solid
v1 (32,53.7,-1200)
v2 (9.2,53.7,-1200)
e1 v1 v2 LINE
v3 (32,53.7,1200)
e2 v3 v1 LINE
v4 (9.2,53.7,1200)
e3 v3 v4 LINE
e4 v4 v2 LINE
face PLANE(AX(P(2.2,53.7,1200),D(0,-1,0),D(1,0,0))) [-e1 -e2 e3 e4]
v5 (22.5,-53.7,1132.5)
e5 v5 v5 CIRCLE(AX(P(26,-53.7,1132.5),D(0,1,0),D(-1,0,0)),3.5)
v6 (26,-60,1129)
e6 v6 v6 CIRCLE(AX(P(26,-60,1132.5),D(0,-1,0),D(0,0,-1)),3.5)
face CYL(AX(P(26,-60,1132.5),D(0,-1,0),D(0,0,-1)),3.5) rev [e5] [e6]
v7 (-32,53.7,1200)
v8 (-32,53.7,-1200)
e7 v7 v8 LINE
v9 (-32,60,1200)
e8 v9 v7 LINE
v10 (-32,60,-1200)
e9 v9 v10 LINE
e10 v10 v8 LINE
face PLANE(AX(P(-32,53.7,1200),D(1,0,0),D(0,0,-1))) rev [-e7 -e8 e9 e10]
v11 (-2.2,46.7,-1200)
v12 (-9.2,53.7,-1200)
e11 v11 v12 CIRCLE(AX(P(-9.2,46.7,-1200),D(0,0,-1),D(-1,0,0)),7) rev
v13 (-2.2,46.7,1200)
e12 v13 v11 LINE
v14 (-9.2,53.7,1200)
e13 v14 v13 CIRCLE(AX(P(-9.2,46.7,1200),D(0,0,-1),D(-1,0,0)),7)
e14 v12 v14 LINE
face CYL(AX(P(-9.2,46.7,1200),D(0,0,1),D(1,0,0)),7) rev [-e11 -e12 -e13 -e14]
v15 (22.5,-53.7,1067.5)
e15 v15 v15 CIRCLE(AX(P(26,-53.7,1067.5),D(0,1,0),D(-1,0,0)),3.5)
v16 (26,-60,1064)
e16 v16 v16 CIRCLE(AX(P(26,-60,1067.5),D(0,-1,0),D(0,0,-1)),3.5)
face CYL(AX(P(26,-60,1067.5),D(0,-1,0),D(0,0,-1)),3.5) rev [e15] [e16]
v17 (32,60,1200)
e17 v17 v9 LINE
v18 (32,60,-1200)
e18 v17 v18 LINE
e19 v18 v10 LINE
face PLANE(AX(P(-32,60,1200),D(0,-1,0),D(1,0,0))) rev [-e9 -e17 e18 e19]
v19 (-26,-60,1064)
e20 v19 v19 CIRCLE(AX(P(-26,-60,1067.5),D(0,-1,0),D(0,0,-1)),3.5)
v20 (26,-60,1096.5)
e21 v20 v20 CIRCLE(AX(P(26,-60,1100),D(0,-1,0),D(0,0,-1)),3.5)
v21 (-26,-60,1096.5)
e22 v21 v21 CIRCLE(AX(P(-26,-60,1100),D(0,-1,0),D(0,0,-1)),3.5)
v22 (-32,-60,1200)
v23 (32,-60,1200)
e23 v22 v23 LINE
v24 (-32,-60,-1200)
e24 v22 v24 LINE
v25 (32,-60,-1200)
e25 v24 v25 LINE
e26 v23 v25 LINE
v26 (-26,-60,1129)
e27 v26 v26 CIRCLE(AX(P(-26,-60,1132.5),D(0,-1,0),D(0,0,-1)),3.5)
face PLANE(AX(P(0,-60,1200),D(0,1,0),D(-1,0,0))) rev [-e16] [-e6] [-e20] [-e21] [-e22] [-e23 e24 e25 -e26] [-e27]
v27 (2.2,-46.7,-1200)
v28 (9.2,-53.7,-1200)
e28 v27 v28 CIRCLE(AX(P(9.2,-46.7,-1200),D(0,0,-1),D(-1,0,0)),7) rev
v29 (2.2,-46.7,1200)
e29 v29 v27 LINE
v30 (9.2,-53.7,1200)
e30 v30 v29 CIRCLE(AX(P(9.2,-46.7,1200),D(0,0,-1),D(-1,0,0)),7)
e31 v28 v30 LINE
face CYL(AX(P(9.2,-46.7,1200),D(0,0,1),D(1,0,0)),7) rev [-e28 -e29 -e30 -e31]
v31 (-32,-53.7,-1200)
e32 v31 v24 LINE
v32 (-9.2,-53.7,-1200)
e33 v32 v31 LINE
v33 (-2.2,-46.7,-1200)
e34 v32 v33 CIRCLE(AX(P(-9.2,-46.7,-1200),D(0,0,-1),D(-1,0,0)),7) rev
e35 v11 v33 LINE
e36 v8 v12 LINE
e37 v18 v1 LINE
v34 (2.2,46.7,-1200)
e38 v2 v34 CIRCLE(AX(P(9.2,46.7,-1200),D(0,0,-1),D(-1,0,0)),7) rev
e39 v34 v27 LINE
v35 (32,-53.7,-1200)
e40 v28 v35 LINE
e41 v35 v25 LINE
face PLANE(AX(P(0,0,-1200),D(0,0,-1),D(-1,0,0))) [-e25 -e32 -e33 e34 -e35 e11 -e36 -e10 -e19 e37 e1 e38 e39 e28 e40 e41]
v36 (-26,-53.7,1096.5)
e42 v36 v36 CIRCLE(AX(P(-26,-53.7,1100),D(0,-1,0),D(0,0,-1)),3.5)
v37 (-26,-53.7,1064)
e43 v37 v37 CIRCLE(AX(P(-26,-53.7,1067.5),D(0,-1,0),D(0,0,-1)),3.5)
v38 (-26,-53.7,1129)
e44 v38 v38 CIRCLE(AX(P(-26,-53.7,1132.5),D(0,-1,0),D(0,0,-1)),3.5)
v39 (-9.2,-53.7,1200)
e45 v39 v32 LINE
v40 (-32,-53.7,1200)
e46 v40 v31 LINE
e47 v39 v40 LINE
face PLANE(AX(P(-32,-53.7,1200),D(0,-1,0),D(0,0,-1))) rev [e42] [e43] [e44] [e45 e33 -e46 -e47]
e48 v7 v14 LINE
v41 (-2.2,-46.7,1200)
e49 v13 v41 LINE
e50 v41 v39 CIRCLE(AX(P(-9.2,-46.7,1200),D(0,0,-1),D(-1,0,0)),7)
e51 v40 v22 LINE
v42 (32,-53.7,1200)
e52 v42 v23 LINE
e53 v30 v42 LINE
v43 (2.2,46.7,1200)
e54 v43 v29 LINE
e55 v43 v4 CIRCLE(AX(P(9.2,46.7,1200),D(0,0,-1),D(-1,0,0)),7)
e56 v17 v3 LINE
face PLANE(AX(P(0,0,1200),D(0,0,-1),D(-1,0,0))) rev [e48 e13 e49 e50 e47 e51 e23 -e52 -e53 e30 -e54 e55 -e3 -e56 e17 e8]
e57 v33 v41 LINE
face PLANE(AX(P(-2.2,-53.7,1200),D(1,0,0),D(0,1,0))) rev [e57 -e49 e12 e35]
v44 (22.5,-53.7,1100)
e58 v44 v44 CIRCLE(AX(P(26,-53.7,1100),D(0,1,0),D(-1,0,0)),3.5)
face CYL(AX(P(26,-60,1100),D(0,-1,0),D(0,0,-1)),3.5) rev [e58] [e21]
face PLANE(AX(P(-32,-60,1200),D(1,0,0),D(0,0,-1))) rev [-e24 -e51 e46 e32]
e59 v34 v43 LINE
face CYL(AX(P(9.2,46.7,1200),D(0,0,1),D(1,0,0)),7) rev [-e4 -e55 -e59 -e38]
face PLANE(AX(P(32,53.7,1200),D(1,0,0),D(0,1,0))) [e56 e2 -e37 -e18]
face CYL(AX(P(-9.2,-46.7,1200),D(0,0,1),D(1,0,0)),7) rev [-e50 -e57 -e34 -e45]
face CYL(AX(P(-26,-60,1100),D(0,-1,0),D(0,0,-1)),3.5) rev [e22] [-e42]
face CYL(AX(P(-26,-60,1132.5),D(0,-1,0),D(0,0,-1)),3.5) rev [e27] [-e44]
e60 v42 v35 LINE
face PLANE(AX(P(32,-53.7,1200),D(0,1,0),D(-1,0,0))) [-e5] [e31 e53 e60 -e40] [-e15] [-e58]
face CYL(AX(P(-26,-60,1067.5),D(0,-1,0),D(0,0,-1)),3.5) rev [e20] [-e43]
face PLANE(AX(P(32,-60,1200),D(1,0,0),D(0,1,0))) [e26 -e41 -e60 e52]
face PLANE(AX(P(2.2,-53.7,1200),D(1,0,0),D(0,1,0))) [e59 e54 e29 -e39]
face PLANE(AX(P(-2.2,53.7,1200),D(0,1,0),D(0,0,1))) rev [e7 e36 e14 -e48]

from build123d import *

# Parameters (mm, degrees)
BOSS_EXTRUDE1_DEPTH      = 1200
MIRROR1_START            = -60
MIRROR1_OUTLINE_W        = 2.2
MIRROR1_OUTLINE_H        = 2400
MIRROR1_DEPTH            = 120
MIRROR1_2_OUTLINE_W      = 29.8
MIRROR1_2_OUTLINE_H      = 2400
MIRROR1_2_DEPTH          = 6.3
MIRROR1_START_2          = 53.7
MIRROR1_3_OUTLINE_W      = 29.8
MIRROR1_3_OUTLINE_H      = 2400
MIRROR1_3_DEPTH          = 6.3
FILLET1_R                = 7
M6_CLEARANCE_HOLE1_D     = 7
M6_CLEARANCE_HOLE1_DEPTH = 6.3
LPATTERN1_COUNT          = 3
LPATTERN1_PITCH          = 32.5
LPATTERN1_COUNT_DIR2     = 2
LPATTERN1_PITCH_DIR2     = 52


# Read off the part's stored shape, not the designer's step: Mirror1
with BuildPart() as part:
    # Sketch1 → Boss-Extrude1 (new, symmetric)
    with BuildSketch(Plane.XY):
        Polygon((0, 60), (0, -60), (-32, -60), (-32, -53.7), (-2.2, -53.7), (-2.2, 53.7), (-32, 53.7), (-32, 60), align=None)
    extrude(amount=BOSS_EXTRUDE1_DEPTH, both=True)

    # Mirror1 outline → Mirror1 (add)
    with BuildSketch(Plane(origin=(0, 0, 0), x_dir=(1, 0, 0), z_dir=(0, 1, 0)).offset(MIRROR1_START)):
        with Locations((1.1, 0)):
            Rectangle(MIRROR1_OUTLINE_W, MIRROR1_OUTLINE_H)
    extrude(amount=MIRROR1_DEPTH)

    # Mirror1 2 outline → Mirror1 2 (add)
    with BuildSketch(Plane(origin=(0, 0, 0), x_dir=(1, 0, 0), z_dir=(0, 1, 0)).offset(MIRROR1_START)):
        with Locations((17.1, 0)):
            Rectangle(MIRROR1_2_OUTLINE_W, MIRROR1_2_OUTLINE_H)
    extrude(amount=MIRROR1_2_DEPTH)

    # Mirror1 3 outline → Mirror1 3 (add)
    with BuildSketch(Plane(origin=(0, 0, 0), x_dir=(1, 0, 0), z_dir=(0, 1, 0)).offset(MIRROR1_START_2)):
        with Locations((17.1, 0)):
            Rectangle(MIRROR1_3_OUTLINE_W, MIRROR1_3_OUTLINE_H)
    extrude(amount=MIRROR1_3_DEPTH)

    # Fillet1
    fillet1_edges = [part.edges().sort_by_distance(p)[0] for p in [
        (-2.2, -53.7, 0),
        (-2.2, 53.7, 0),
        (2.2, -53.7, 0),
        (2.2, 53.7, 0),
    ]]
    fillet(fillet1_edges, radius=FILLET1_R)

    # M6 Clearance Hole1
    with Locations(Plane(origin=(0, -60, 0), x_dir=(-1, 0, 0), z_dir=(0, -1, 0))):
        with Locations((-26, -1132.5)):
            m6_clearance_hole1 = Hole(M6_CLEARANCE_HOLE1_D / 2, depth=M6_CLEARANCE_HOLE1_DEPTH)

    # LPattern1: M6 Clearance Hole1 3 × 2
    with Locations(*[(-j * LPATTERN1_PITCH_DIR2, 0, -i * LPATTERN1_PITCH) for i in range(LPATTERN1_COUNT) for j in range(LPATTERN1_COUNT_DIR2) if (i, j) != (0, 0)]):
        add(m6_clearance_hole1, mode=Mode.SUBTRACT)


solid = part.part
